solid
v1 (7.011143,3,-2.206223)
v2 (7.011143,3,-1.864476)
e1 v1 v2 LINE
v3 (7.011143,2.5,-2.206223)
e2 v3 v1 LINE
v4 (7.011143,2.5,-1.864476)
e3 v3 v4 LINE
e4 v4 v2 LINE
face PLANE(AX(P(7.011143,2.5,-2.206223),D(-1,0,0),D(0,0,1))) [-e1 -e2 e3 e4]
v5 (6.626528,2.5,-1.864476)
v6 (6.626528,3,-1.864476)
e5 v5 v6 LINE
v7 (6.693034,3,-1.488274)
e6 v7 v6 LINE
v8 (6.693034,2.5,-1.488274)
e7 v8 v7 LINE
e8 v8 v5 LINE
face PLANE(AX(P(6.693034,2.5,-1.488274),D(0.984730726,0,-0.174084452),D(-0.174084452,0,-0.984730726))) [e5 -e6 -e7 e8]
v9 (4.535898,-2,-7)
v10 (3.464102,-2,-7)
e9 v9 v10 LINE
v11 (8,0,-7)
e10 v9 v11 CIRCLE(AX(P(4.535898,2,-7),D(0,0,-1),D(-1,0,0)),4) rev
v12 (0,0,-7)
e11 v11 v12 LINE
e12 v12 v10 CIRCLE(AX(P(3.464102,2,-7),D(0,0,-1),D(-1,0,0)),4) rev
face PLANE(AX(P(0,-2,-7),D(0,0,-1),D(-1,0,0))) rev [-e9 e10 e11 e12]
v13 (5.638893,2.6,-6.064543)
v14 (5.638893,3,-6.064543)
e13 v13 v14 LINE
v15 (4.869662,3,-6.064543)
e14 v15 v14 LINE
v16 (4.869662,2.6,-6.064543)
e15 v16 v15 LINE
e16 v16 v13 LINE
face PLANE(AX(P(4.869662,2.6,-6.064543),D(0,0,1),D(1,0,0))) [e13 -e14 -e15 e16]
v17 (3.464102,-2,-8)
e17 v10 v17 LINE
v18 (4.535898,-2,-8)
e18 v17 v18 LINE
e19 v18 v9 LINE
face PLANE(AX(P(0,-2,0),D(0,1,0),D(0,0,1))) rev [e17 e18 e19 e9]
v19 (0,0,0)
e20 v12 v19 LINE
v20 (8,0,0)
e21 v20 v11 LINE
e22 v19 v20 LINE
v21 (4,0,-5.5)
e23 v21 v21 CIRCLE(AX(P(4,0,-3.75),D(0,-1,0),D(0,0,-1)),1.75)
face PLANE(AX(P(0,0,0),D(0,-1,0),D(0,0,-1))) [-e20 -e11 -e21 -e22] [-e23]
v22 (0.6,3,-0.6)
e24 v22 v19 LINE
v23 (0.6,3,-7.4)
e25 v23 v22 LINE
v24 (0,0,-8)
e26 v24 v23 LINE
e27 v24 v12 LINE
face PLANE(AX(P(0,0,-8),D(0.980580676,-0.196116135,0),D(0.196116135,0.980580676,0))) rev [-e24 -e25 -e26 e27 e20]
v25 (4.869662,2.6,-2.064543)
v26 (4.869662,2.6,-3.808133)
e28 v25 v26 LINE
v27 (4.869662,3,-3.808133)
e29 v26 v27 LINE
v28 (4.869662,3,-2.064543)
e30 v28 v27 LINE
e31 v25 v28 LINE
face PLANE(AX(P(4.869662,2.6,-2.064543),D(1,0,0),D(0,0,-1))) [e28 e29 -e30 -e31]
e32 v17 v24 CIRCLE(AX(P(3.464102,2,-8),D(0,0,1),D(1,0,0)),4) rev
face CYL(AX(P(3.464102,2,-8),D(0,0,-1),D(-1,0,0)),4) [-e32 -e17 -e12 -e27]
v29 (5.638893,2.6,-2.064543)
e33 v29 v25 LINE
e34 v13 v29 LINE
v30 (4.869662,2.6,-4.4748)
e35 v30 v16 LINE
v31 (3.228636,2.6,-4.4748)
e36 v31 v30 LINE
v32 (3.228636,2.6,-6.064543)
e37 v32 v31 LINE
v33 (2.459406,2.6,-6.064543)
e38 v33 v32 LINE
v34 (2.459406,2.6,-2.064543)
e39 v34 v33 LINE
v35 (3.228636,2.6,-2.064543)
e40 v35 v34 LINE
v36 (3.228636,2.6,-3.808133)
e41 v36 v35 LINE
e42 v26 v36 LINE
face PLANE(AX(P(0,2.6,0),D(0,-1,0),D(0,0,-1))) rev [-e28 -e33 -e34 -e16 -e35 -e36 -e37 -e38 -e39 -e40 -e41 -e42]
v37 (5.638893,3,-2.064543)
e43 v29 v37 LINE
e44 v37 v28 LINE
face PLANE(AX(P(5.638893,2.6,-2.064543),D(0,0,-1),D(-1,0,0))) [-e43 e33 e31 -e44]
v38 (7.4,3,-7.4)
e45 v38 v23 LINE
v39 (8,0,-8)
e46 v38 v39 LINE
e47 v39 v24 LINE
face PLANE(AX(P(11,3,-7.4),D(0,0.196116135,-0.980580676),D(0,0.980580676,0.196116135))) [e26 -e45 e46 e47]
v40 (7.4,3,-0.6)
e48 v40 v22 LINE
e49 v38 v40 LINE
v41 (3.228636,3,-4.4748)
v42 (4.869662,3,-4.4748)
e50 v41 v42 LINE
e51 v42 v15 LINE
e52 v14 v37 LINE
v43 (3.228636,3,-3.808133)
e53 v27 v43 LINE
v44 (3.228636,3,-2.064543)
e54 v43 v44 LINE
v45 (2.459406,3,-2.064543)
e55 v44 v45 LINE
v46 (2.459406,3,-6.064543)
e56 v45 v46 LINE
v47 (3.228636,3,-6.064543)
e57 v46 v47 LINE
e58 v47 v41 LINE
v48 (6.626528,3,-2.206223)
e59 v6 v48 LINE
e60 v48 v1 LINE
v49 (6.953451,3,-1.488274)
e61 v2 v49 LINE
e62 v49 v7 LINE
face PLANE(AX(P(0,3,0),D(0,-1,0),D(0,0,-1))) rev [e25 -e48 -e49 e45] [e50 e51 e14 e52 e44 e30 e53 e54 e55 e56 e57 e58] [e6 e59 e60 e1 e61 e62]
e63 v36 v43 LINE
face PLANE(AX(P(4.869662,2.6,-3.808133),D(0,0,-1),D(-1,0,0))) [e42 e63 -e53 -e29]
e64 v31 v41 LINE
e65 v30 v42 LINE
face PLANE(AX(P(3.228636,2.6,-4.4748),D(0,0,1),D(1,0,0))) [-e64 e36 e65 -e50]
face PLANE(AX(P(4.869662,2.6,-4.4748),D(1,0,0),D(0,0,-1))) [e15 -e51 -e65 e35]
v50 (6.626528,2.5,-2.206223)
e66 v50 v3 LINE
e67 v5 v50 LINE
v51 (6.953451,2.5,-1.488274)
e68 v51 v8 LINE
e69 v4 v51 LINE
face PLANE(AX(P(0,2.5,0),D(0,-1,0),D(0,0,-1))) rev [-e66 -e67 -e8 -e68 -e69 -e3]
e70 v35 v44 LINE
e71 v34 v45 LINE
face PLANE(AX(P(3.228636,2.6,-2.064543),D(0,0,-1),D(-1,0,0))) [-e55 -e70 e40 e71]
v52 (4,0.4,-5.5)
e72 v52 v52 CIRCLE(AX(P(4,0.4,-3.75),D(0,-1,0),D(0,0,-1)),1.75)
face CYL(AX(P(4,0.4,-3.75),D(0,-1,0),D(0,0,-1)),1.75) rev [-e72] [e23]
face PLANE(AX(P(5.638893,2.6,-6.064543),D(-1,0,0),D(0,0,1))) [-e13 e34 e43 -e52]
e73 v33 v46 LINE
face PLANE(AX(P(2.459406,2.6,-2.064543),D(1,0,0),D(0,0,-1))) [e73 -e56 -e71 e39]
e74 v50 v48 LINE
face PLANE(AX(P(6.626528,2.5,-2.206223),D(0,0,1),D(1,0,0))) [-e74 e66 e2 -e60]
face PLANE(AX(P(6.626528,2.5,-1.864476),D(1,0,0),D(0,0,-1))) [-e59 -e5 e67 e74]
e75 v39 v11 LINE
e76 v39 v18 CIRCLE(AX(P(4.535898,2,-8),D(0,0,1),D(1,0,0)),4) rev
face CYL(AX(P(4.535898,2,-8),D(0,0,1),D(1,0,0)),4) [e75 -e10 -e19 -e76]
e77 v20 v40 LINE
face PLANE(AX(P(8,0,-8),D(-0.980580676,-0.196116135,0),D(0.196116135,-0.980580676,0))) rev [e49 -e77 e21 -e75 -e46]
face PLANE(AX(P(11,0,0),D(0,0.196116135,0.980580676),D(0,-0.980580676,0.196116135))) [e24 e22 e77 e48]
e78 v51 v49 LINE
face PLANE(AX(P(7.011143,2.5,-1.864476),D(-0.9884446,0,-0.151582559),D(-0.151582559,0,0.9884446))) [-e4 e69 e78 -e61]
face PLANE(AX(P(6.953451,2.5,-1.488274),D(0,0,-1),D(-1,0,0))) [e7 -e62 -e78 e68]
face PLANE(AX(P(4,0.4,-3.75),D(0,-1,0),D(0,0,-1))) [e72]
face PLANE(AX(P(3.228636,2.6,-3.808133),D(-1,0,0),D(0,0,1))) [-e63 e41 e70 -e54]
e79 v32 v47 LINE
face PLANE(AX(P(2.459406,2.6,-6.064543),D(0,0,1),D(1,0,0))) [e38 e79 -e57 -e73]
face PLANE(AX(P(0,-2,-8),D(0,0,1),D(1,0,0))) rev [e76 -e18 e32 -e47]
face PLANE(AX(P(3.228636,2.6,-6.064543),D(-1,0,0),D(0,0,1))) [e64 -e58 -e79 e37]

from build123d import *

# Parameters (mm, degrees)
SKETCH1_W               = 8
SKETCH1_H               = 8
BOSS_EXTRUDE1_DEPTH     = 3
CUT_EXTRUDE1_DEPTH      = 12.704699911
CUT_EXTRUDE1_DEPTH_BACK = 12.704699911
CUT_EXTRUDE2_DEPTH      = 11
SKETCH4_R               = 1.75
CUT_EXTRUDE3_DEPTH      = 0.4
SKETCH5_W               = 8
SKETCH5_H               = 1
BOSS_EXTRUDE2_DEPTH     = 2
FILLET1_R               = 4
CUT_EXTRUDE4_DEPTH      = 0.4
CUT_EXTRUDE5_DEPTH      = 0.5


with BuildPart() as part:
    # Sketch1 → Boss-Extrude1 (new body)
    with BuildSketch(Plane(origin=(0, 0, 0), x_dir=(1, 0, 0), z_dir=(0, 1, 0))):
        with Locations((4, 4)):
            Rectangle(SKETCH1_W, SKETCH1_H)
    extrude(amount=BOSS_EXTRUDE1_DEPTH)

    # Sketch2 → Cut-Extrude1 (cut, two sides: drawn at the far end of the back side and taken through both)
    with BuildSketch(Plane.XY.offset(-CUT_EXTRUDE1_DEPTH_BACK)):
        Polygon((0, 0), (0.6, 3), (0, 3), align=None)
        Polygon((8, 0), (7.4, 3), (8, 3), align=None)
    extrude(amount=CUT_EXTRUDE1_DEPTH + CUT_EXTRUDE1_DEPTH_BACK, mode=Mode.SUBTRACT)

    # Sketch3 → Cut-Extrude2 (cut)
    with BuildSketch(Plane(origin=(0, 0, 0), x_dir=(0, 0, -1), z_dir=(1, 0, 0))):
        Polygon((0, 0), (0.6, 3), (0, 3), align=None)
        Polygon((8, 3), (7.4, 3), (8, 0), align=None)
    extrude(amount=CUT_EXTRUDE2_DEPTH, mode=Mode.SUBTRACT)

    # Sketch4 → Cut-Extrude3 (cut)
    with BuildSketch(Plane.XZ):
        with Locations(Location((4, -3.75, 0), (0, 0, 270))):
            Circle(SKETCH4_R)
    extrude(amount=-CUT_EXTRUDE3_DEPTH, mode=Mode.SUBTRACT)

    # Sketch5 → Boss-Extrude2 (add)
    with BuildSketch(Plane.XZ):
        with Locations((4, -7.5)):
            Rectangle(SKETCH5_W, SKETCH5_H)
    extrude(amount=BOSS_EXTRUDE2_DEPTH)

    # Fillet1
    # the kernel refuses this fillet: 4 mm, written as the material it takes off along each edge
    with BuildSketch(Plane(origin=(8, -2, -16.660254038), x_dir=(0, 1, 0), z_dir=(0, 0, 1)), Plane(origin=(0, -2, 1.660254038), x_dir=(0, 1, 0), z_dir=(0, 0, -1))) as fillet1_piece_1:
        with BuildLine():
            CenterArc((4, 3.464101615), FILLET1_R, 180, 60)
            Line((0, 3.464101615), (-0.08, 3.464101615))
            Line((-0.08, 3.464101615), (-0.08, 0))
            Line((-0.08, 0), (0, -0.08))
            ThreePointArc((0, -0.08), (1, -0.08), (1.96, -0.069282032))
            Line((1.96, -0.069282032), (2, 0))
        make_face()
    extrude(amount=18.320508076, mode=Mode.SUBTRACT)

    # Sketch6 → Cut-Extrude4 (cut)
    with BuildSketch(Plane(origin=(0, 3, 0), x_dir=(1, 0, 0), z_dir=(0, 1, 0))):
        Polygon((2.459405501, 2.064543337), (2.459405501, 6.064543337), (3.22863627, 6.064543337), (3.22863627, 4.474799747), (4.869661911, 4.474799747), (4.869661911, 6.064543337), (5.63889268, 6.064543337), (5.63889268, 2.064543337), (4.869661911, 2.064543337), (4.869661911, 3.80813308), (3.22863627, 3.80813308), (3.22863627, 2.064543337), align=None)
    extrude(amount=-CUT_EXTRUDE4_DEPTH, mode=Mode.SUBTRACT)

    # Sketch7 → Cut-Extrude5 (cut)
    with BuildSketch(Plane(origin=(0, 3, 0), x_dir=(1, 0, 0), z_dir=(0, 1, 0))):
        Polygon((6.693034442, 1.488274187), (6.626528032, 1.86447611), (6.626528032, 2.206222905), (7.011143417, 2.206222905), (7.011143417, 1.86447611), (6.953451109, 1.488274187), align=None)
    extrude(amount=-CUT_EXTRUDE5_DEPTH, mode=Mode.SUBTRACT)


solid = part.part
